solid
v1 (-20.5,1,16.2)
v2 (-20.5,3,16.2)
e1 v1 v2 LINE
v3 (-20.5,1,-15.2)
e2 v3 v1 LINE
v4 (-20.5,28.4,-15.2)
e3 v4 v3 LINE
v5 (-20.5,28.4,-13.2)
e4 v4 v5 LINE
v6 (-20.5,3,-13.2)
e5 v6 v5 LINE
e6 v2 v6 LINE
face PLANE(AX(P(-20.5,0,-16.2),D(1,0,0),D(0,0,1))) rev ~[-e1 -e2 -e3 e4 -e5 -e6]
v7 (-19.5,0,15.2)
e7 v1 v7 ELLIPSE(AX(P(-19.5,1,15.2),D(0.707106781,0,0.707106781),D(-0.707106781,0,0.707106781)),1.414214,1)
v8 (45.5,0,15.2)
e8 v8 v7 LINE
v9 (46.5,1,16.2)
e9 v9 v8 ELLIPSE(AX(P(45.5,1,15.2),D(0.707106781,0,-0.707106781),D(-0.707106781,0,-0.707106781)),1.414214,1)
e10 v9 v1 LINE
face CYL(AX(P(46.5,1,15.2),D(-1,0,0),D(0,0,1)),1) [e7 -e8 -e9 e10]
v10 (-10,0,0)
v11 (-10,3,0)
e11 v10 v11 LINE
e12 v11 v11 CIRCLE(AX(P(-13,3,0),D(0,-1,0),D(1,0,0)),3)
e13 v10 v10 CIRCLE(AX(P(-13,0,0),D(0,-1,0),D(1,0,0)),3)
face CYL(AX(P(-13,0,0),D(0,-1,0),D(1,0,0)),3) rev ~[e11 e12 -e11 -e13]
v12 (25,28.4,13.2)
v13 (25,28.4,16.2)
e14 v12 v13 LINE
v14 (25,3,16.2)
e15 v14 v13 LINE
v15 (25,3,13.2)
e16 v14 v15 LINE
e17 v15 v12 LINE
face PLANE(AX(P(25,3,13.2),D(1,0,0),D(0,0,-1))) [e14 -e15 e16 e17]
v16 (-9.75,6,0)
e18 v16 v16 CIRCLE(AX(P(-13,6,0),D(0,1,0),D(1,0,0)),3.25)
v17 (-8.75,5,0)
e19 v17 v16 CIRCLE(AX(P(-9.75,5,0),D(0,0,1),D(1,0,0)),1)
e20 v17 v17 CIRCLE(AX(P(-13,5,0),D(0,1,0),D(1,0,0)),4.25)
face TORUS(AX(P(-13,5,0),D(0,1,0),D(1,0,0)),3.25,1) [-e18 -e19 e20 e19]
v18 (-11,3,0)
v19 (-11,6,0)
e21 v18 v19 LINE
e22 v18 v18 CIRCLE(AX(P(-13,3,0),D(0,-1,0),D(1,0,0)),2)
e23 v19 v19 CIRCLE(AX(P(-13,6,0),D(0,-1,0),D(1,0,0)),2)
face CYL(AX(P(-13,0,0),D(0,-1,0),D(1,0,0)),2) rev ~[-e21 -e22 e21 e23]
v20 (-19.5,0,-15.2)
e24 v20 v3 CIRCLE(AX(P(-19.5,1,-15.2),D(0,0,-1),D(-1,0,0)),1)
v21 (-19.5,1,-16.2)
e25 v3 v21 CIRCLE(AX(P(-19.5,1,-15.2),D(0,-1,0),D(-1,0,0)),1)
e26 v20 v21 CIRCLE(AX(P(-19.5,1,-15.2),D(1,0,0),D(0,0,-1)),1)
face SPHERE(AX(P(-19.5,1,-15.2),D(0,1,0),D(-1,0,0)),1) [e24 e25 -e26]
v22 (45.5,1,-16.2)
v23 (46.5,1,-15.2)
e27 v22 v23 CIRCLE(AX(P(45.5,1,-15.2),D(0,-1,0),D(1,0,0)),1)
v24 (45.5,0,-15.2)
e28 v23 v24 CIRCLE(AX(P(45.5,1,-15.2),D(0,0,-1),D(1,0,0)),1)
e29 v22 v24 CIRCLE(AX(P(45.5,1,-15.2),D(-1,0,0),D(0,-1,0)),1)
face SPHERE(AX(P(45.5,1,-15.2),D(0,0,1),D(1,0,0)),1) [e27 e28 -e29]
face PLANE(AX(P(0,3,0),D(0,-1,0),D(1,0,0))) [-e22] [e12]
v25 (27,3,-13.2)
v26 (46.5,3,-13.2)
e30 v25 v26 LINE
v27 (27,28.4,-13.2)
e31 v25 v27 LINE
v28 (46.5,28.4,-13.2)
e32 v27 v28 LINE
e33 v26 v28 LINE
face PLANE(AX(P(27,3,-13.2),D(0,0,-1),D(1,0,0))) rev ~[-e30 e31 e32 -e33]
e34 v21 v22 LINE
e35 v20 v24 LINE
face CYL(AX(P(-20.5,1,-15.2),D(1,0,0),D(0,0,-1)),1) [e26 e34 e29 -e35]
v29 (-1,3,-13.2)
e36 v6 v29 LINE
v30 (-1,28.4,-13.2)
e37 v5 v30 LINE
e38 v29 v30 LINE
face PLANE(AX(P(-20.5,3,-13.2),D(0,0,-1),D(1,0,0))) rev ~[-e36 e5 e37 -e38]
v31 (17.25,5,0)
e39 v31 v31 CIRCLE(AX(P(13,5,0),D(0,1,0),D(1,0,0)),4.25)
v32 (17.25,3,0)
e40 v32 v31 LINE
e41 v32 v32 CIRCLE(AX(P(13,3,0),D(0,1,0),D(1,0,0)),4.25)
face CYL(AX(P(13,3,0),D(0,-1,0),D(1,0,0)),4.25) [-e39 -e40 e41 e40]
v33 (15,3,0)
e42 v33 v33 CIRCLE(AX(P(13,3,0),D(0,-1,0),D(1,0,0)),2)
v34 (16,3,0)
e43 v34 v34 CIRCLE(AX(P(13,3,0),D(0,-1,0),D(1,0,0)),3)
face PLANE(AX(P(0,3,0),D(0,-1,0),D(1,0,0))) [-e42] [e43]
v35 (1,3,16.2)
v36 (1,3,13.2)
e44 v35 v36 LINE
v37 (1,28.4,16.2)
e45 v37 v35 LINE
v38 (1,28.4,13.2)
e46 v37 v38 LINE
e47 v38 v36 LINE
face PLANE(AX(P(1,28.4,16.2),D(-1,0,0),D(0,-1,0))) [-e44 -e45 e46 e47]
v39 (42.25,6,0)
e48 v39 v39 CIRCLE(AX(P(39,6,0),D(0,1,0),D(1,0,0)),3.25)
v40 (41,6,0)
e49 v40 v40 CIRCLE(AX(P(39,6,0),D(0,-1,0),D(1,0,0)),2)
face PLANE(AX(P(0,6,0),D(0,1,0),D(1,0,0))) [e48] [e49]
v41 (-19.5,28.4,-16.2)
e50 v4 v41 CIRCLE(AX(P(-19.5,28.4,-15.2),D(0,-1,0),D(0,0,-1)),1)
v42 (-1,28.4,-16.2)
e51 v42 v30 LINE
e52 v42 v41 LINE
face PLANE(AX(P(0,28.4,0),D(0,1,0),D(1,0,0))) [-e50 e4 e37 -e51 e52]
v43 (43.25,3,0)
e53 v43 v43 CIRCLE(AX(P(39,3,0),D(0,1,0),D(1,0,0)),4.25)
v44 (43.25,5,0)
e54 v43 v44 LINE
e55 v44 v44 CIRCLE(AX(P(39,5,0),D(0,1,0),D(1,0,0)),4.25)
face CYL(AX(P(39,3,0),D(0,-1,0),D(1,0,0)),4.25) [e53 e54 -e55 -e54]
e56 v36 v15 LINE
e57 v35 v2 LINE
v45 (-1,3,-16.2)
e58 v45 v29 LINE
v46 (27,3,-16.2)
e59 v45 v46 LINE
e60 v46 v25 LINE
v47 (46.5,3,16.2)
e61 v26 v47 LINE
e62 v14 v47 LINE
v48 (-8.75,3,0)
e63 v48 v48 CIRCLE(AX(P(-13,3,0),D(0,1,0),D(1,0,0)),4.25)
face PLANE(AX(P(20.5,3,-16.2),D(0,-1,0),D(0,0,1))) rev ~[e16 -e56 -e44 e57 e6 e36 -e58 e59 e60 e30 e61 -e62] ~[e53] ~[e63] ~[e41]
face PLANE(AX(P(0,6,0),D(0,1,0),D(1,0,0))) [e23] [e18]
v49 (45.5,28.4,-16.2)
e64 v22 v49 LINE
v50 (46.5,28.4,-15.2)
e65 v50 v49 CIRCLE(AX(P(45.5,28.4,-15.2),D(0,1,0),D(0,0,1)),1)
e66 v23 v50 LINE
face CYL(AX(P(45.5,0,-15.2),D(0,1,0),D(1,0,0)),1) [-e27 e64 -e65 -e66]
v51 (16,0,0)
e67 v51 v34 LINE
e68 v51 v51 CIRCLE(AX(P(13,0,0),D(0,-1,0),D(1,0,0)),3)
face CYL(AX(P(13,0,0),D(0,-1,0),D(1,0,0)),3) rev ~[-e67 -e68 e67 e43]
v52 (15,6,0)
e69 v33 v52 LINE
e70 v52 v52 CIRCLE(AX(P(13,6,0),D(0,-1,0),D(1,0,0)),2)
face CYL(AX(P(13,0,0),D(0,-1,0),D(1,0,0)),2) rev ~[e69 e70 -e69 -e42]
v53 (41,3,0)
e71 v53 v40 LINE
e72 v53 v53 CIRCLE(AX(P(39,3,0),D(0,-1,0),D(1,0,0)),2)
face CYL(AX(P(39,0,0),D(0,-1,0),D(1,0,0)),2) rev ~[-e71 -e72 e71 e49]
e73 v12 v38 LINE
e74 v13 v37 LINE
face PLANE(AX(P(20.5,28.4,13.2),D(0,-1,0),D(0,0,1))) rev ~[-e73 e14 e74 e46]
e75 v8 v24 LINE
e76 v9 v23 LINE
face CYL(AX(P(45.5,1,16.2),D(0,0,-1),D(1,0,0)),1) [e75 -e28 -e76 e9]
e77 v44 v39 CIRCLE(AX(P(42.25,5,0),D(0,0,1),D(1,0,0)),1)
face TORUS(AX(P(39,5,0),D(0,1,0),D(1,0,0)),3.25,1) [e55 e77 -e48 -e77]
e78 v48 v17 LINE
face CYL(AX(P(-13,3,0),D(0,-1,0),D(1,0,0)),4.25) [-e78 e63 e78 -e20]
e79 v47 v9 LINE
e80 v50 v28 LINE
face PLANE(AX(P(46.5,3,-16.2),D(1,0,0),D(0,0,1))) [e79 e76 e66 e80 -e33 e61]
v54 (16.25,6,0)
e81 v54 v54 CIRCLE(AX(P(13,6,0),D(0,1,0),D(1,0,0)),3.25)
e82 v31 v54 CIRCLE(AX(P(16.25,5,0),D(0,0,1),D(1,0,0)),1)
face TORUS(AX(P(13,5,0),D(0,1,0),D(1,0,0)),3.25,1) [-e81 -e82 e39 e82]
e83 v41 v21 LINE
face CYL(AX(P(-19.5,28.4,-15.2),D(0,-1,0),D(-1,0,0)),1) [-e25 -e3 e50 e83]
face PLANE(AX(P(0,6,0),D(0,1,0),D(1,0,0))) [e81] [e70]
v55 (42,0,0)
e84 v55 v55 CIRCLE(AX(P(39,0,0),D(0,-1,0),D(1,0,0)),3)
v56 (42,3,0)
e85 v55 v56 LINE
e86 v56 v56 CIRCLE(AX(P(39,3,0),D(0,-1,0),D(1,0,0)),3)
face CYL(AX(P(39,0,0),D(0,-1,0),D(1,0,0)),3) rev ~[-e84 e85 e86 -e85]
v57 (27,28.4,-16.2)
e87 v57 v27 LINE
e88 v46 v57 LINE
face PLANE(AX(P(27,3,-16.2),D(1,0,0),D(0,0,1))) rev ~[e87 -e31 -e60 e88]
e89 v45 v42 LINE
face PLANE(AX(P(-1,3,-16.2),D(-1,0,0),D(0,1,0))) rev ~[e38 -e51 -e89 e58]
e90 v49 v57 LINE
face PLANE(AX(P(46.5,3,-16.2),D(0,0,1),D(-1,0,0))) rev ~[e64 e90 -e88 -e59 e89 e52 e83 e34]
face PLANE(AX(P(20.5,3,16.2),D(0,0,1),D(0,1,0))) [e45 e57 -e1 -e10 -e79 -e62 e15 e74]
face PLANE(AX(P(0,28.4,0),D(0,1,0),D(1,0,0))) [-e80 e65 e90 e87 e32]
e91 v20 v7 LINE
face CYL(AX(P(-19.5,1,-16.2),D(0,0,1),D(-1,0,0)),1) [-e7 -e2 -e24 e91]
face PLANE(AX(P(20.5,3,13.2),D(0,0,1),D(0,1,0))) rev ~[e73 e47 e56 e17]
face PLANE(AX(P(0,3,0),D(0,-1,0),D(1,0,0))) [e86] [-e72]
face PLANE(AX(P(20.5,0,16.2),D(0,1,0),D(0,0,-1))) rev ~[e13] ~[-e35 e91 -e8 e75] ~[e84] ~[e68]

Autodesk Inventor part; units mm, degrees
ref_plane "YZ Plane" through (0, 0, 0) normal (1, 0, 0) x (0, 1, 0)
ref_plane "XZ Plane" through (0, 0, 0) normal (0, 1, 0) x (-1, 0, 0)
ref_plane "XY Plane" through (0, 0, 0) normal (0, 0, 1) x (1, 0, 0)
sketch "Sketch1" plane through (0, 0, 0) normal (0, 1, 0) x (-1, 0, 0)
  line L0 (20.5, 16.2) -> (-20.5, 16.2)
  line L1 (-20.5, 16.2) -> (-20.5, -16.2)
  line L2 (-20.5, -16.2) -> (20.5, -16.2)
  line L3 (20.5, -16.2) -> (20.5, 16.2)
  point P0 (0, 0)
  dimension "d0" = 41
  dimension "d1" = 32.4
extrude "Extrusion1" add sketch "Sketch1" along normal blind 3
sketch "Sketch3" plane through (0, 3, 0) normal (0, 1, 0) x (1, 0, 0)
  line L0 (-20.5, -16.2) -> (20.5, -16.2) projected
  line L1 (-20.5, 16.2) -> (-20.5, -16.2) projected
  line L2 (20.5, -16.2) -> (-20.5, -16.2)
  line L3 (-20.5, -16.2) -> (-20.5, -13.2)
  line L4 (-20.5, -13.2) -> (20.5, -13.2)
  line L5 (20.5, -13.2) -> (20.5, -16.2)
  line L6 (20.5, 16.2) -> (-20.5, 16.2) projected
  line L7 (20.5, 16.2) -> (-20.5, 16.2)
  line L8 (-20.5, 16.2) -> (-20.5, 13.2)
  line L9 (-20.5, 13.2) -> (20.5, 13.2)
  line L10 (20.5, 13.2) -> (20.5, 16.2)
  point P0 (0, 0)
  dimension "d8" = 3
  dimension "d9" = 3
extrude "Extrusion3" add sketch "Sketch3" along normal blind 25.4
sketch "Sketch4" plane through (20.5, 0, -16.2) normal (0, 0, -1) x (-1, 0, 0)
  line L0 (41, 3) -> (0, 3) projected
  line L1 (0, 28.4) -> (41, 28.4) projected
  line L2 (0, 3) -> (21.5, 3)
  line L3 (21.5, 3) -> (21.5, 28.4)
  line L4 (21.5, 28.4) -> (0, 28.4)
  line L5 (0, 28.4) -> (0, 3)
  point P0 (20.5, 0)
  dimension "d12" = 21.5
extrude "Extrusion4" cut sketch "Sketch4" against normal blind 3
sketch "Sketch5" plane through (-20.5, 0, 16.2) normal (0, 0, 1) x (1, 0, 0)
  line L0 (41, 28.4) -> (0, 28.4) projected
  line L1 (19.5, 3) -> (41, 3) projected
  line L2 (0, 28.4) -> (21.5, 28.4)
  line L3 (21.5, 28.4) -> (21.5, 3)
  line L4 (21.5, 3) -> (0, 3)
  line L5 (0, 3) -> (0, 28.4)
  point P0 (20.5, 0)
  dimension "d15" = 21.5
extrude "Extrusion5" cut sketch "Sketch5" against normal blind 3
sketch "Sketch6" plane through (0, 3, 0) normal (0, 1, 0) x (1, 0, 0)
  circle A0 centre (13, 0) radius 4.25
  circle A1 centre (-13, 0) radius 4.25
  line L0 (-20.5, 13.2) -> (-20.5, -16.2) projected
  line L1 (20.5, -13.2) -> (20.5, 16.2) projected
  point P0 (0, 0)
  dimension "d20" = 8.5
  dimension "d21" = 8.5
  dimension "d32" = 26
  dimension "d33" = 7.5
  dimension "d34" = 7.5
extrude "Extrusion6" add sketch "Sketch6" along normal blind 3
sketch "Sketch9" plane through (20.5, 0, 16.2) normal (1, 0, 0) x (0, 0, -1)
  line L0 (32.4, 0) -> (32.4, 3) projected
  line L1 (32.4, 3) -> (0, 3)
  line L2 (0, 3) -> (0, 0)
  line L3 (0, 0) -> (32.4, 0)
  line L4 (32.4, 0) -> (32.4, 3)
  point P0 (16.2, 0)
extrude "Extrusion9" add sketch "Sketch9" along normal blind 26
sketch "Sketch10" plane through (0, 3, 0) normal (0, 1, 0) x (1, 0, 0)
  circle A0 centre (39, 0) radius 4.25
  point P0 (0, 0)
  dimension "d37" = 8.5
extrude "Extrusion10" add sketch "Sketch10" along normal blind 3
sketch "Sketch11" plane through (0, 3, 0) normal (0, 1, 0) x (1, 0, 0)
  line L0 (46.5, 16.2) -> (46.5, -16.2) projected
  line L1 (46.5, 16.2) -> (27, 16.2)
  line L2 (27, 16.2) -> (27, 13.2)
  line L3 (27, 13.2) -> (46.5, 13.2)
  line L4 (46.5, 13.2) -> (46.5, 16.2)
  point P0 (0, 0)
  dimension "d40" = 19.5
  dimension "d41" = 3
extrude "Extrusion11" add sketch "Sketch11" along normal blind 25.4
sketch "Sketch14" plane through (20.5, 3, 13.2) normal (1, 0, 0) x (0, 0, -1)
  line L0 (0, 0) -> (0, 25.4) projected
  line L1 (-3, 0) -> (-3, 25.4) projected
  line L2 (0, 25.4) -> (-3, 25.4)
  line L3 (-3, 25.4) -> (-3, 0)
  line L4 (-3, 0) -> (0, 0)
  line L5 (0, 0) -> (0, 25.4)
  point P0 (13.2, -3)
extrude "Extrusion14" add sketch "Sketch14" along normal blind 4.5
fillet "Fillet1" radius 1 3 edges at (-17.25, 6, 0) (8.75, 6, 0) (34.75, 6, 0)
fillet "Fillet2" radius 1 6 edges at (-20.5, 14.2, -16.2) (-20.5, 0, 0) (13, 0, 16.2) (46.5, 0, 0) (46.5, 14.2, -16.2) (13, 0, -16.2)
sketch "Sketch15" plane through (0, 0, 0) normal (0, -1, 0) x (1, 0, 0)
  circle A0 centre (39, 0) radius 4.25 projected
  circle A1 centre (39, 0) radius 2
  circle A2 centre (13, 0) radius 3.25 projected
  circle A3 centre (13, 0) radius 2
  circle A4 centre (-13, 0) radius 3.25 projected
  circle A5 centre (-13, 0) radius 2
  point P0 (0, 0)
  dimension "d54" = 4
  dimension "d55" = 4
  dimension "d56" = 4
extrude "Extrusion15" cut sketch "Sketch15" against normal blind 10 contours A1 | A3 | A5
sketch "Sketch16" plane through (0, 0, 0) normal (0, -1, 0) x (1, 0, 0)
  circle A0 centre (39, 0) radius 2 projected
  circle A1 centre (39, 0) radius 3
  circle A2 centre (13, 0) radius 2 projected
  circle A3 centre (13, 0) radius 3
  circle A4 centre (-13, 0) radius 2 projected
  circle A5 centre (-13, 0) radius 3
  point P0 (0, 0)
  dimension "d59" = 6
  dimension "d60" = 6
  dimension "d61" = 6
extrude "Extrusion16" cut sketch "Sketch16" against normal blind 3 contours A0 | A1 | A2 | A3 | A4 | A5
properties part number "railBracketBottom"
